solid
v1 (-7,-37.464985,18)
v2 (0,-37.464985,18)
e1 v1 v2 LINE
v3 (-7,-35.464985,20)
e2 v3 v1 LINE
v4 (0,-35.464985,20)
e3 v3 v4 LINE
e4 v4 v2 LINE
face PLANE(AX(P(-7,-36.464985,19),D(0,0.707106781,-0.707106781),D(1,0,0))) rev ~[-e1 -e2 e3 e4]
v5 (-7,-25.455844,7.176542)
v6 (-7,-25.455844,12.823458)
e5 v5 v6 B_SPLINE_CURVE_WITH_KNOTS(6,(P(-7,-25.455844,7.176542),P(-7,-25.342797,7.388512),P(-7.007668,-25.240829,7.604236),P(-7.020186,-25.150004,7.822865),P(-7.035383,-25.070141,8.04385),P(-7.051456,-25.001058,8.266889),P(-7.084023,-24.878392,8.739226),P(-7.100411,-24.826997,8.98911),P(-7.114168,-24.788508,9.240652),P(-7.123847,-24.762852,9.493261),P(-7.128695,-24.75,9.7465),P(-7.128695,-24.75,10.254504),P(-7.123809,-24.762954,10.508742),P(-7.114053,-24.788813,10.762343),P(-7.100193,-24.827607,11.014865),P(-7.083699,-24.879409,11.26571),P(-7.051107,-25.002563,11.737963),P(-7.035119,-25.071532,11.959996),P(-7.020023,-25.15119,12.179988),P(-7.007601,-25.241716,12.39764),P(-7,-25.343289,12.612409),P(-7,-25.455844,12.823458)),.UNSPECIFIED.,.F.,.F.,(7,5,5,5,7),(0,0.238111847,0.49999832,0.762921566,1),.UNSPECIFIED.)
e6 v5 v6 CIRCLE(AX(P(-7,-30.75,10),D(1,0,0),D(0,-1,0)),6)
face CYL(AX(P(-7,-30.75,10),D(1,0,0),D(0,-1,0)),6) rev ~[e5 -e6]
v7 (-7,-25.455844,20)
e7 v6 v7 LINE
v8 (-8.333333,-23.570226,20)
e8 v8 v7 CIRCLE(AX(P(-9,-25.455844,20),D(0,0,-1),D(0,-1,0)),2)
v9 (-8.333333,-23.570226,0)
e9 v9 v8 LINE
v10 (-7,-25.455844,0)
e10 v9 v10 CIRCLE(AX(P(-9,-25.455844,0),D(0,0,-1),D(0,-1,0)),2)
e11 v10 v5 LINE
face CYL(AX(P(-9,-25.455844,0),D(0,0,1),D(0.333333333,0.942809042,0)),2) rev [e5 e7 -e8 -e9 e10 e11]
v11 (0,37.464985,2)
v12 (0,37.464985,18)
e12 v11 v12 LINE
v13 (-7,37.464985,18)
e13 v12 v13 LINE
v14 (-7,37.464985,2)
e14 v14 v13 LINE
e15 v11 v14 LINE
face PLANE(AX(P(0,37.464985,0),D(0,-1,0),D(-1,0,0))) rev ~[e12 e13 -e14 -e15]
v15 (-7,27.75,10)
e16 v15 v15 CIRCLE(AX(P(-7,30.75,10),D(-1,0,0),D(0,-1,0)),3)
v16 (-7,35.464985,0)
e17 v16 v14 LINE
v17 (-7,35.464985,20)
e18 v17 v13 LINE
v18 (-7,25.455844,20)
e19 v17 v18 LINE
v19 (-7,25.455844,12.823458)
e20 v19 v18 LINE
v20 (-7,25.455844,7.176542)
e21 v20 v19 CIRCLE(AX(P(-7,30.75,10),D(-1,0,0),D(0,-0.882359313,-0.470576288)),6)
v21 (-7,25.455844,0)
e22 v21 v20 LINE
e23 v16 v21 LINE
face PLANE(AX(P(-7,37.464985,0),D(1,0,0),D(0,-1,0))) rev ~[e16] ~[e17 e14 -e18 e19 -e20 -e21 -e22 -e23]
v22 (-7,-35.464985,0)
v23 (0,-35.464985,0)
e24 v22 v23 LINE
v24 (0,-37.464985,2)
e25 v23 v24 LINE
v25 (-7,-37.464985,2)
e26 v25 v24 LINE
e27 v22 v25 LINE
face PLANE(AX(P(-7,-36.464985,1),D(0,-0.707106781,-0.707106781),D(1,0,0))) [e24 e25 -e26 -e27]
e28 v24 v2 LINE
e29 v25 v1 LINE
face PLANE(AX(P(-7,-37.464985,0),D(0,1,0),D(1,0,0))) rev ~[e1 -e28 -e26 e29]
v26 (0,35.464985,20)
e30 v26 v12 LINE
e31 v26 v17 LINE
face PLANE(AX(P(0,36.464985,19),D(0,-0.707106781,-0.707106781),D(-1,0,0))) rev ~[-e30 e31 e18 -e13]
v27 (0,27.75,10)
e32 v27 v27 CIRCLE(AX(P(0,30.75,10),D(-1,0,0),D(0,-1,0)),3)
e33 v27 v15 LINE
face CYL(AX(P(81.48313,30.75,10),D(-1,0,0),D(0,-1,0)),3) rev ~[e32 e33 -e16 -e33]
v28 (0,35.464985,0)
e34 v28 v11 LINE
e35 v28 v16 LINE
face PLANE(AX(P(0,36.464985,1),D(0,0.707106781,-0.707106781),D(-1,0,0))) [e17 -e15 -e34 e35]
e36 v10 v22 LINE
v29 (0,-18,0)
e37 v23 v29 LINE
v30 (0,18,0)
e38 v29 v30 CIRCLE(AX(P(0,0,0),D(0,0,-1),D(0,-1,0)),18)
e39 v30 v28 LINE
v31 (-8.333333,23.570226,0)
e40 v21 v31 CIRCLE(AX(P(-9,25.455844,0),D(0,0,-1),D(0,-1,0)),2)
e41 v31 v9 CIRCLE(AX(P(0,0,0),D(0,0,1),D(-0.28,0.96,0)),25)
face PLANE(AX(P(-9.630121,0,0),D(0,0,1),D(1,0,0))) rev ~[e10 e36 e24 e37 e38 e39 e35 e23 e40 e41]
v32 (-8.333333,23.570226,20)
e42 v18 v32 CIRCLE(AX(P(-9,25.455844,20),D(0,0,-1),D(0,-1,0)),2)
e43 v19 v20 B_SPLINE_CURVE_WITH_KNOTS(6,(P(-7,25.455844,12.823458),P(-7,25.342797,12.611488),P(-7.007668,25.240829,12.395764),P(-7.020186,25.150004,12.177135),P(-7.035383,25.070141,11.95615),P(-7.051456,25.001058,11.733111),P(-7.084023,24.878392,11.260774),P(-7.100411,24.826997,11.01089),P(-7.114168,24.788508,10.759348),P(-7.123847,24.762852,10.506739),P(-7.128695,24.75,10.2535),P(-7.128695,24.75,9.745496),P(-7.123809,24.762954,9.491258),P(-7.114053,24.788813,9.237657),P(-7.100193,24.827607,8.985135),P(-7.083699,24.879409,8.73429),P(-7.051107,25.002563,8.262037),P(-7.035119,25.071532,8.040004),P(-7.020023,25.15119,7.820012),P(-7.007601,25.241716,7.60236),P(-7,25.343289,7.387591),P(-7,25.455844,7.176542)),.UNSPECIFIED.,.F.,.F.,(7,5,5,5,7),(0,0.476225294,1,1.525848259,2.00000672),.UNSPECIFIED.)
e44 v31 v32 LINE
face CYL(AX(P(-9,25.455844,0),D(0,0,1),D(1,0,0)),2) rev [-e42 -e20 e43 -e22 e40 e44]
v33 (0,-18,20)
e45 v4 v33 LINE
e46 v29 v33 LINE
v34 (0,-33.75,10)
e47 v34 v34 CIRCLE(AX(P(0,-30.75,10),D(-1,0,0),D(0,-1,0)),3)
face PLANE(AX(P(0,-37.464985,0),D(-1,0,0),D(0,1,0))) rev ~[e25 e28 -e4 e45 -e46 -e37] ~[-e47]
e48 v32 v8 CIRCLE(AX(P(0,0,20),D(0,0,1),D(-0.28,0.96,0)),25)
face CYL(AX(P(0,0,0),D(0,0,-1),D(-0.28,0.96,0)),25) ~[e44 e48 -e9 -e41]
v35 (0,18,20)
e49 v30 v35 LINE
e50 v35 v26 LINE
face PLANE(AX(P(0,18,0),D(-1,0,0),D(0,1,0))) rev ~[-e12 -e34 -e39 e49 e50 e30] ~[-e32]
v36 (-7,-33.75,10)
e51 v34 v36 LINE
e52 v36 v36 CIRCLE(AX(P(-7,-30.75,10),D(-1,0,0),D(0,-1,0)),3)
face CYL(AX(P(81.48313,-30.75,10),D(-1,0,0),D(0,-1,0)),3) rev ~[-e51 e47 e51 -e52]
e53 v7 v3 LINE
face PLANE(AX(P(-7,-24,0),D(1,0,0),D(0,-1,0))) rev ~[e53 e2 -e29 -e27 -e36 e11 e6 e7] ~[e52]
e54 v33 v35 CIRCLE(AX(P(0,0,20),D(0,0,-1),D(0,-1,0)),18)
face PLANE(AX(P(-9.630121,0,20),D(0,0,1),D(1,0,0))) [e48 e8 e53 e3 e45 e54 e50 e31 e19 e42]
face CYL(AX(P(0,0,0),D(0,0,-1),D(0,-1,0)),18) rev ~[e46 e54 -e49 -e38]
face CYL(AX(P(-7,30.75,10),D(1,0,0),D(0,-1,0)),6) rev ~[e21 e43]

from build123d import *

# Parameters (mm, degrees)
F1_DEPTH = 20
F3_D     = 6
F4_SIZE  = 2
F5_R     = 2
F7_D     = 12
F7_DEPTH = 12
F7_TIP   = 3.6051637142
F9_D     = 12
F9_DEPTH = 12
F9_TIP   = 3.6051637142


# Not quite as in the source:
# - a feature names something its author has since deleted; it is built from what else it names


with BuildPart() as f1:
    # F0 (on Top) → F1 (new body)
    with BuildSketch(Plane.XY):
        with BuildLine():
            Line((0, 18), (0, 22.5))
            Line((0, 22.5), (0, 37.4649850279))
            Line((0, 37.4649850279), (-7, 37.4649850279))
            Line((-7, 37.4649850279), (-7, 24))
            ThreePointArc((-7, 24), (-25, 0), (-7, -24))
            Line((-7, -24), (-7, -37.4649850279))
            Line((-7, -37.4649850279), (0, -37.4649850279))
            Line((0, -37.4649850279), (0, -22.5))
            Line((0, -22.5), (0, -18))
            ThreePointArc((0, -18), (-18, 0), (0, 18))
        make_face()
    extrude(amount=F1_DEPTH)

    # F3 (through all)
    with Locations(Plane.YZ):
        with Locations((-30.75, 10), (30.75, 10)):
            Hole(F3_D / 2)

    # F4
    f4_edges = [f1.edges().sort_by_distance(p)[0] for p in [
        (-3.5, -37.464985, 20),
        (-3.5, -37.464985, 0),
        (-3.5, 37.464985, 20),
        (-3.5, 37.464985, 0),
    ]]
    chamfer(f4_edges, length=F4_SIZE)

    # F5
    f5_edges = [f1.edges().sort_by_distance(p)[0] for p in [
        (-7, -24, 10),
        (-7, 24, 10),
    ]]
    fillet(f5_edges, radius=F5_R)

    # F7 (one way)
    with BuildSketch(Plane(origin=(-7, 0, 0), x_dir=(0, -1, 0), z_dir=(1, 0, 0))):
        with Locations((30.75, -10)):
            Circle(F7_D / 2)
    extrude(amount=-F7_DEPTH, mode=Mode.SUBTRACT)
    with Locations(Plane(origin=(-7, 0, 0), x_dir=(0, -1, 0), z_dir=(1, 0, 0))):
        with Locations((30.75, -10)):
            with Locations((0, 0, -(F7_DEPTH + F7_TIP / 2))):  # 118° drill point
                Cone(0, F7_D / 2, F7_TIP, mode=Mode.SUBTRACT)

    # F9 (one way)
    with BuildSketch(Plane(origin=(-7, 0, 0), x_dir=(0, -1, 0), z_dir=(1, 0, 0))):
        with Locations((-30.75, -10)):
            Circle(F9_D / 2)
    extrude(amount=-F9_DEPTH, mode=Mode.SUBTRACT)
    with Locations(Plane(origin=(-7, 0, 0), x_dir=(0, -1, 0), z_dir=(1, 0, 0))):
        with Locations((-30.75, -10)):
            with Locations((0, 0, -(F9_DEPTH + F9_TIP / 2))):  # 118° drill point
                Cone(0, F9_D / 2, F9_TIP, mode=Mode.SUBTRACT)


solid = f1.part
